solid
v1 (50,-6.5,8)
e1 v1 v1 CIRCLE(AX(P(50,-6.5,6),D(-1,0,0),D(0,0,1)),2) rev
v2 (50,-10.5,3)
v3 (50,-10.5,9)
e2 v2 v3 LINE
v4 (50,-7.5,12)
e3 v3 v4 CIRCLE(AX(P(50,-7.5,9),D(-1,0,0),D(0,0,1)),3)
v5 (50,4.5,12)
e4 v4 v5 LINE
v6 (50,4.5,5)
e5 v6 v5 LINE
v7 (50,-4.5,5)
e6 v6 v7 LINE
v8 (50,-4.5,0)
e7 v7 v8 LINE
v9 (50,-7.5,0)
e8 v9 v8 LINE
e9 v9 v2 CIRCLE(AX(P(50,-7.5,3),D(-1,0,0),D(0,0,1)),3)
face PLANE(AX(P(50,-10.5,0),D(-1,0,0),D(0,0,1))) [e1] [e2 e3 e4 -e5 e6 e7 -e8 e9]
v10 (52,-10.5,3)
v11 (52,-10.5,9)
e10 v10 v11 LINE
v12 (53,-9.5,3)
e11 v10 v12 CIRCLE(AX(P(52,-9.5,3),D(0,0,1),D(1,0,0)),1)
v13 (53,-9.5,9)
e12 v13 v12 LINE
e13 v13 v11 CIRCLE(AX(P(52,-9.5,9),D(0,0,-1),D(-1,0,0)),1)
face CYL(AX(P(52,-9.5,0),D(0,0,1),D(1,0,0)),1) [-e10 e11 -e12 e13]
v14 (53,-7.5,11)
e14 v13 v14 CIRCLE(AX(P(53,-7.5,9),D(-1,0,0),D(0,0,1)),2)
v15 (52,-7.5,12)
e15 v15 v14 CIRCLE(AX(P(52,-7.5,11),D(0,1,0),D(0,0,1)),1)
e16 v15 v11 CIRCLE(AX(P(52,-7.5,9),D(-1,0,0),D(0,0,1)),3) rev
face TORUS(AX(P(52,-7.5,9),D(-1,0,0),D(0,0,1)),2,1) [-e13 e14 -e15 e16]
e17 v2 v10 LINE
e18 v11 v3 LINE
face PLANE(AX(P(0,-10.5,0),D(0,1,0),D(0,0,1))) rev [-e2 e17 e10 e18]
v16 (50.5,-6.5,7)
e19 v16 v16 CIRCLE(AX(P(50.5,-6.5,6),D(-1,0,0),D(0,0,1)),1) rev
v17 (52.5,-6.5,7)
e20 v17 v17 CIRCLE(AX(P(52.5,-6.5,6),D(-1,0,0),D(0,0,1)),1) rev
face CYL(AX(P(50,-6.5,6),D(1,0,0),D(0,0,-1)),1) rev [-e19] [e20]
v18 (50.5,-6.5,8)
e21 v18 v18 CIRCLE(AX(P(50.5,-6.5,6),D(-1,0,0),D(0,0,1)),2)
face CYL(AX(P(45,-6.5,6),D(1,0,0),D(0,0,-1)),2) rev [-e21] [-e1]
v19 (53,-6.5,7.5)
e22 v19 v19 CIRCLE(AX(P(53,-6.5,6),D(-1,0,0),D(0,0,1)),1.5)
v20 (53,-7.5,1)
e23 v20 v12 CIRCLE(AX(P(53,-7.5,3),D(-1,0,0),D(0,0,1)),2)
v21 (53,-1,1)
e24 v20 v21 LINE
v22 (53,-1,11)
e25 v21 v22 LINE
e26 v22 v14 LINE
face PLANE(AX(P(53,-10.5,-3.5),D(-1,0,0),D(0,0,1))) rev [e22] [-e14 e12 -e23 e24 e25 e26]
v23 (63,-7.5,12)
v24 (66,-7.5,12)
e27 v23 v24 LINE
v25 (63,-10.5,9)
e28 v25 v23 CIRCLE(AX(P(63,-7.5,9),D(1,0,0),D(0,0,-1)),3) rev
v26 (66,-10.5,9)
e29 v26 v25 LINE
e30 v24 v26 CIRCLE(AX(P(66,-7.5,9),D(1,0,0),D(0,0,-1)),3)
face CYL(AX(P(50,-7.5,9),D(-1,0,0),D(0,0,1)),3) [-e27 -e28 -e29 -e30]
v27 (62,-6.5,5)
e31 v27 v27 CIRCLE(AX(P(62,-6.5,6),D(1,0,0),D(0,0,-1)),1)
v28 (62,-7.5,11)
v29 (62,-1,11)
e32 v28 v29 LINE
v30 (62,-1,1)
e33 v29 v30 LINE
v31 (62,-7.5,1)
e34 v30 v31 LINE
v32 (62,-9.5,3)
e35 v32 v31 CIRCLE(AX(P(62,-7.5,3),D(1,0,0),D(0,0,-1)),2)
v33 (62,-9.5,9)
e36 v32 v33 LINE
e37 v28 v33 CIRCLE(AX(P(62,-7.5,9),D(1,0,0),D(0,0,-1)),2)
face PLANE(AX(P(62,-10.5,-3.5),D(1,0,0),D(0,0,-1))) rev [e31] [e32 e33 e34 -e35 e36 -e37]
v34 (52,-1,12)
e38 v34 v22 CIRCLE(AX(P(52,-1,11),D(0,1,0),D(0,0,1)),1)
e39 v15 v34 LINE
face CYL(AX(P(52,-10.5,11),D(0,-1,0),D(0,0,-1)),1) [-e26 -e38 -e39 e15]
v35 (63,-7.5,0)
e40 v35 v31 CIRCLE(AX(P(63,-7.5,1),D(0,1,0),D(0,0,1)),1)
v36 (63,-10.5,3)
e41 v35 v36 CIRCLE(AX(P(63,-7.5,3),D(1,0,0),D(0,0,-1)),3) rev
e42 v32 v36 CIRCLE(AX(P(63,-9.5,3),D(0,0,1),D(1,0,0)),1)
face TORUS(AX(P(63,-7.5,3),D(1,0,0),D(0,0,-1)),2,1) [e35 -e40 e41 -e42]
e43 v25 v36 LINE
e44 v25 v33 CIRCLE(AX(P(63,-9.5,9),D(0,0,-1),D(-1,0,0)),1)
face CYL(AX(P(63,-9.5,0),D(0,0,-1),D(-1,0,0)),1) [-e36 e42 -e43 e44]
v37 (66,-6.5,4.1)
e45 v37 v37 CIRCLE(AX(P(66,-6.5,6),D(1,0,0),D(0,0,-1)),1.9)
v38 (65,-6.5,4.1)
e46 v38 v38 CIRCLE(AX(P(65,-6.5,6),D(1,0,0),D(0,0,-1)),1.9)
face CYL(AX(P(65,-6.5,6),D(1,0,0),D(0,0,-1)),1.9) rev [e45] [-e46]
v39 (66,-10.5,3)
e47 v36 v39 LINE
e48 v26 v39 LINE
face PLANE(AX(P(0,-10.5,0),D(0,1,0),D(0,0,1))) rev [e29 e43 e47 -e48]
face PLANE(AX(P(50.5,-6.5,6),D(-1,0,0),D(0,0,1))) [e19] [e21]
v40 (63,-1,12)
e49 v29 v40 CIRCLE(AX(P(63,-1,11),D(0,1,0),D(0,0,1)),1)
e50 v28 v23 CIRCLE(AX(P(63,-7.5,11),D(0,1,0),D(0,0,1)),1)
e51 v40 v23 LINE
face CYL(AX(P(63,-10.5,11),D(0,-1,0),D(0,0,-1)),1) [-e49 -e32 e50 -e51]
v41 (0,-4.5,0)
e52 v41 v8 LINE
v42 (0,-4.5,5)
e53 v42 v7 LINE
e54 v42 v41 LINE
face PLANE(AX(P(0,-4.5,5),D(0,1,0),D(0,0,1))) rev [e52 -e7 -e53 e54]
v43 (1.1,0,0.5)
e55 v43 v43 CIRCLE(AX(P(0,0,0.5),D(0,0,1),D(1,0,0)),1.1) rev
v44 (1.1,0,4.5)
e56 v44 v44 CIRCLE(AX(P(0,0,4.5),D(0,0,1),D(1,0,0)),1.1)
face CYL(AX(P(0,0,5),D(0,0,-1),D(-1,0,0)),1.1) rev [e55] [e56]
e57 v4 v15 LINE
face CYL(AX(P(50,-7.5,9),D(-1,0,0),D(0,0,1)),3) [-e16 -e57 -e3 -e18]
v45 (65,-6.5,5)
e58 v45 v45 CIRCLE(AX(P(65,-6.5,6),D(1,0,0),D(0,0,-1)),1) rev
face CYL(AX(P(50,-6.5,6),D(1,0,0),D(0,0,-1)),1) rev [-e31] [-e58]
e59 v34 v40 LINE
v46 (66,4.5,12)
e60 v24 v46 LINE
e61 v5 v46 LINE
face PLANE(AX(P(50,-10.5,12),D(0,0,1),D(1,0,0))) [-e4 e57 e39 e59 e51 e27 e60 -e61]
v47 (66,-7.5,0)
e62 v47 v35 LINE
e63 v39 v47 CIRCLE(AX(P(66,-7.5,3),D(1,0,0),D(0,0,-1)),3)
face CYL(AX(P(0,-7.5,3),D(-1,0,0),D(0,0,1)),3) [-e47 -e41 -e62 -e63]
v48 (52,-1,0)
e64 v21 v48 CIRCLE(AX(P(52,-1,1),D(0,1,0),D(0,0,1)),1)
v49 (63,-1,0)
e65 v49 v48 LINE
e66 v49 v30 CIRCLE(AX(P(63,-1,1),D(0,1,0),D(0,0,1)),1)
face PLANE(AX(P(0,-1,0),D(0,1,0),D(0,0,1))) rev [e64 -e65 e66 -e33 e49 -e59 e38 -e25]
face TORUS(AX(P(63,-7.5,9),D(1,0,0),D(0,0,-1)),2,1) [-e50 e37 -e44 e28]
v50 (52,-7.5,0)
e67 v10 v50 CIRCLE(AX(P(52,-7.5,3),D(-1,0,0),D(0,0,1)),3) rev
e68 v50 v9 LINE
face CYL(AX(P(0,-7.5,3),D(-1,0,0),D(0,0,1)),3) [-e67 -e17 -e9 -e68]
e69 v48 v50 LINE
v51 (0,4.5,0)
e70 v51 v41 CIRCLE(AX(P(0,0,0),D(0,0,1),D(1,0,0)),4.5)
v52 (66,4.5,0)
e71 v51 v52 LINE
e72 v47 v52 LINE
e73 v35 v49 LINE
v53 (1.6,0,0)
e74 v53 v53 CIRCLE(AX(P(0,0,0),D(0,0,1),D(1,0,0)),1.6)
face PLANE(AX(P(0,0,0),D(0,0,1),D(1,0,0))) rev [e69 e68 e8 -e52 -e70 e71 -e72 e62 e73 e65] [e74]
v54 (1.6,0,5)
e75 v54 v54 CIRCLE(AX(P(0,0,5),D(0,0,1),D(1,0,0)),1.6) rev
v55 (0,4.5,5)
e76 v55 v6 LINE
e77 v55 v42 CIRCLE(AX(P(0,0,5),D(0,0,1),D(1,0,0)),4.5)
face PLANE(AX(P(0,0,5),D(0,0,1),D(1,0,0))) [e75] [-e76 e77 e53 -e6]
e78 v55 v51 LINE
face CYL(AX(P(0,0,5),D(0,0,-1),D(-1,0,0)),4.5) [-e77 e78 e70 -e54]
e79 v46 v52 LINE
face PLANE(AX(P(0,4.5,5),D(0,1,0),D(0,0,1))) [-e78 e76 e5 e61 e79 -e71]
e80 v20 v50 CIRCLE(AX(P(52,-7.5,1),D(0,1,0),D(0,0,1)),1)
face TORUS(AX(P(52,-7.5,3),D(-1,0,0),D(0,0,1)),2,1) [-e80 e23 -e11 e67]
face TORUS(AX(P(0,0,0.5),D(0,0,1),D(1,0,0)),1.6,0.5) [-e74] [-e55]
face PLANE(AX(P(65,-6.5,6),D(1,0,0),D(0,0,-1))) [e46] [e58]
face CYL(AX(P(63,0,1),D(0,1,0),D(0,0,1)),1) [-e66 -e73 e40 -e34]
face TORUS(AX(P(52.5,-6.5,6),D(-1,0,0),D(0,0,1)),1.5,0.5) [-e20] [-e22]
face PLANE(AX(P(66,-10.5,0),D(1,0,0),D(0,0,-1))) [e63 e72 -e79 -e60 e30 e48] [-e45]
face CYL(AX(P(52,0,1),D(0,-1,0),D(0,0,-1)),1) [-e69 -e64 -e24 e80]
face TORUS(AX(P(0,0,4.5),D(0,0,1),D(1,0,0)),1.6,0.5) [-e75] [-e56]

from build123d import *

# Parameters (mm, degrees)
SKETCH1_R           = 1.1
BOSS_EXTRUDE1_DEPTH = 5
SKETCH2_W           = 16
SKETCH2_H           = 12
BOSS_EXTRUDE2_DEPTH = 15
CUT_EXTRUDE1_START  = -5.5
SKETCH3_W           = 9
SKETCH3_H           = 15.5
CUT_EXTRUDE1_DEPTH  = 9.5
SKETCH4_R           = 1
CUT_EXTRUDE2_DEPTH  = 16
FILLET2_R           = 0.5
SKETCH5_R           = 1.9
CUT_EXTRUDE3_DEPTH  = 1
FILLET3_R           = 1
CUT_EXTRUDE4_START  = -0.5
SKETCH6_R           = 2
CUT_EXTRUDE4_DEPTH  = 5.5
FILLET4_R           = 3
FILLET5_R           = 0.5


with BuildPart() as part:
    # Sketch1 → Boss-Extrude1 (new body)
    with BuildSketch(Plane.XY):
        with BuildLine():
            ThreePointArc((0, 4.5), (-4.5, 0), (0, -4.5))
            Line((0, -4.5), (50, -4.5))
            Line((50, -4.5), (50, 4.5))
            Line((50, 4.5), (0, 4.5))
        make_face()
        Circle(SKETCH1_R, mode=Mode.SUBTRACT)
    extrude(amount=BOSS_EXTRUDE1_DEPTH)

    # Sketch2 → Boss-Extrude2 (add)
    with BuildSketch(Plane(origin=(0, 4.5, 0), x_dir=(1, 0, 0), z_dir=(0, 1, 0))):
        with Locations((58, -6)):
            Rectangle(SKETCH2_W, SKETCH2_H)
    extrude(amount=-BOSS_EXTRUDE2_DEPTH)

    # Sketch3 → Cut-Extrude1 (cut)
    with BuildSketch(Plane(origin=(0, 4.5, 0), x_dir=(1, 0, 0), z_dir=(0, 1, 0)).offset(CUT_EXTRUDE1_START)):
        with Locations((57.5, -4.25)):
            Rectangle(SKETCH3_W, SKETCH3_H)
    extrude(amount=-CUT_EXTRUDE1_DEPTH, mode=Mode.SUBTRACT)

    # Sketch4 → Cut-Extrude2 (cut)
    with BuildSketch(Plane(origin=(66, 0, 0), x_dir=(0, 0, -1), z_dir=(1, 0, 0))):
        with Locations((-6, -6.5)):
            Circle(SKETCH4_R)
    extrude(amount=-CUT_EXTRUDE2_DEPTH, mode=Mode.SUBTRACT)

    # Fillet2
    fillet2_edges = [part.edges().sort_by_distance(p)[0] for p in [
        (53, -6.5, 7),
    ]]
    fillet(fillet2_edges, radius=FILLET2_R)

    # Sketch5 → Cut-Extrude3 (cut)
    with BuildSketch(Plane(origin=(66, 0, 0), x_dir=(0, 0, -1), z_dir=(1, 0, 0))):
        with Locations((-6, -6.5)):
            Circle(SKETCH5_R)
    extrude(amount=-CUT_EXTRUDE3_DEPTH, mode=Mode.SUBTRACT)

    # Fillet3
    fillet3_edges = [part.edges().sort_by_distance(p)[0] for p in [
        (53, -10.5, 6),
        (62, -10.5, 6),
        (62, -5.75, 0),
        (53, -5.75, 0),
        (53, -5.75, 12),
        (62, -5.75, 12),
    ]]
    fillet(fillet3_edges, radius=FILLET3_R)

    # Sketch6 → Cut-Extrude4 (cut)
    with BuildSketch(Plane.ZY.offset(-50).offset(CUT_EXTRUDE4_START)):
        with Locations((6, -6.5)):
            Circle(SKETCH6_R)
    extrude(amount=CUT_EXTRUDE4_DEPTH, mode=Mode.SUBTRACT)

    # Fillet4
    # the kernel refuses this fillet: 3 mm, written as the material it takes off along each edge
    with BuildSketch(Plane(origin=(53, -7.5, 3), x_dir=(0, -1, 0), z_dir=(0, 0, 1))) as fillet4_piece_1:
        with BuildLine():
            CenterArc((2, -1), 1, 0, 90)
            Line((3, -1), (3, 0))
            Line((3, 0), (2, 0))
        make_face()
    revolve(axis=Axis((53, -7.5, 3), (1, 0, 0)), revolution_arc=90, mode=Mode.SUBTRACT)
    with BuildSketch(Plane(origin=(53, -7.5, 9), x_dir=(0, 0, 1), z_dir=(0, 1, 0))) as fillet4_piece_2:
        with BuildLine():
            CenterArc((2, -1), 1, 0, 90)
            Line((3, -1), (3, 0))
            Line((3, 0), (2, 0))
        make_face()
    revolve(axis=Axis((53, -7.5, 9), (1, 0, 0)), revolution_arc=90, mode=Mode.SUBTRACT)
    with BuildSketch(Plane(origin=(62, -7.5, 9), x_dir=(0, -1, 0), z_dir=(0, 0, -1))) as fillet4_piece_3:
        with BuildLine():
            CenterArc((2, -1), 1, 0, 90)
            Line((3, -1), (3, 0))
            Line((3, 0), (2, 0))
        make_face()
    revolve(axis=Axis((62, -7.5, 9), (-1, 0, 0)), revolution_arc=90, mode=Mode.SUBTRACT)
    with BuildSketch(Plane(origin=(62, -7.5, 3), x_dir=(0, 0, -1), z_dir=(0, 1, 0))) as fillet4_piece_4:
        with BuildLine():
            CenterArc((2, -1), 1, 0, 90)
            Line((3, -1), (3, 0))
            Line((3, 0), (2, 0))
        make_face()
    revolve(axis=Axis((62, -7.5, 3), (-1, 0, 0)), revolution_arc=90, mode=Mode.SUBTRACT)
    with BuildSketch(Plane(origin=(62, -10.5, 0), x_dir=(0, 1, 0), z_dir=(1, 0, 0)), Plane(origin=(73.5, -10.5, 12), x_dir=(0, 1, 0), z_dir=(-1, 0, 0))) as fillet4_piece_5:
        with BuildLine():
            CenterArc((FILLET4_R, FILLET4_R), FILLET4_R, 180, 90)
            Line((0, FILLET4_R), (0, 0))
            Line((0, 0), (FILLET4_R, 0))
        make_face()
    extrude(amount=11.5, mode=Mode.SUBTRACT)
    with BuildSketch(Plane(origin=(53, -10.5, 12), x_dir=(0, 1, 0), z_dir=(-1, 0, 0)), Plane(origin=(42.5, -10.5, 0), x_dir=(0, 1, 0), z_dir=(1, 0, 0))) as fillet4_piece_6:
        with BuildLine():
            CenterArc((FILLET4_R, FILLET4_R), FILLET4_R, 180, 90)
            Line((0, FILLET4_R), (0, 0))
            Line((0, 0), (FILLET4_R, 0))
        make_face()
    extrude(amount=10.5, mode=Mode.SUBTRACT)

    # Fillet5
    fillet5_edges = [part.edges().sort_by_distance(p)[0] for p in [
        (-1.1, 0, 5),
        (-1.1, 0, 0),
    ]]
    fillet(fillet5_edges, radius=FILLET5_R)


solid = part.part
